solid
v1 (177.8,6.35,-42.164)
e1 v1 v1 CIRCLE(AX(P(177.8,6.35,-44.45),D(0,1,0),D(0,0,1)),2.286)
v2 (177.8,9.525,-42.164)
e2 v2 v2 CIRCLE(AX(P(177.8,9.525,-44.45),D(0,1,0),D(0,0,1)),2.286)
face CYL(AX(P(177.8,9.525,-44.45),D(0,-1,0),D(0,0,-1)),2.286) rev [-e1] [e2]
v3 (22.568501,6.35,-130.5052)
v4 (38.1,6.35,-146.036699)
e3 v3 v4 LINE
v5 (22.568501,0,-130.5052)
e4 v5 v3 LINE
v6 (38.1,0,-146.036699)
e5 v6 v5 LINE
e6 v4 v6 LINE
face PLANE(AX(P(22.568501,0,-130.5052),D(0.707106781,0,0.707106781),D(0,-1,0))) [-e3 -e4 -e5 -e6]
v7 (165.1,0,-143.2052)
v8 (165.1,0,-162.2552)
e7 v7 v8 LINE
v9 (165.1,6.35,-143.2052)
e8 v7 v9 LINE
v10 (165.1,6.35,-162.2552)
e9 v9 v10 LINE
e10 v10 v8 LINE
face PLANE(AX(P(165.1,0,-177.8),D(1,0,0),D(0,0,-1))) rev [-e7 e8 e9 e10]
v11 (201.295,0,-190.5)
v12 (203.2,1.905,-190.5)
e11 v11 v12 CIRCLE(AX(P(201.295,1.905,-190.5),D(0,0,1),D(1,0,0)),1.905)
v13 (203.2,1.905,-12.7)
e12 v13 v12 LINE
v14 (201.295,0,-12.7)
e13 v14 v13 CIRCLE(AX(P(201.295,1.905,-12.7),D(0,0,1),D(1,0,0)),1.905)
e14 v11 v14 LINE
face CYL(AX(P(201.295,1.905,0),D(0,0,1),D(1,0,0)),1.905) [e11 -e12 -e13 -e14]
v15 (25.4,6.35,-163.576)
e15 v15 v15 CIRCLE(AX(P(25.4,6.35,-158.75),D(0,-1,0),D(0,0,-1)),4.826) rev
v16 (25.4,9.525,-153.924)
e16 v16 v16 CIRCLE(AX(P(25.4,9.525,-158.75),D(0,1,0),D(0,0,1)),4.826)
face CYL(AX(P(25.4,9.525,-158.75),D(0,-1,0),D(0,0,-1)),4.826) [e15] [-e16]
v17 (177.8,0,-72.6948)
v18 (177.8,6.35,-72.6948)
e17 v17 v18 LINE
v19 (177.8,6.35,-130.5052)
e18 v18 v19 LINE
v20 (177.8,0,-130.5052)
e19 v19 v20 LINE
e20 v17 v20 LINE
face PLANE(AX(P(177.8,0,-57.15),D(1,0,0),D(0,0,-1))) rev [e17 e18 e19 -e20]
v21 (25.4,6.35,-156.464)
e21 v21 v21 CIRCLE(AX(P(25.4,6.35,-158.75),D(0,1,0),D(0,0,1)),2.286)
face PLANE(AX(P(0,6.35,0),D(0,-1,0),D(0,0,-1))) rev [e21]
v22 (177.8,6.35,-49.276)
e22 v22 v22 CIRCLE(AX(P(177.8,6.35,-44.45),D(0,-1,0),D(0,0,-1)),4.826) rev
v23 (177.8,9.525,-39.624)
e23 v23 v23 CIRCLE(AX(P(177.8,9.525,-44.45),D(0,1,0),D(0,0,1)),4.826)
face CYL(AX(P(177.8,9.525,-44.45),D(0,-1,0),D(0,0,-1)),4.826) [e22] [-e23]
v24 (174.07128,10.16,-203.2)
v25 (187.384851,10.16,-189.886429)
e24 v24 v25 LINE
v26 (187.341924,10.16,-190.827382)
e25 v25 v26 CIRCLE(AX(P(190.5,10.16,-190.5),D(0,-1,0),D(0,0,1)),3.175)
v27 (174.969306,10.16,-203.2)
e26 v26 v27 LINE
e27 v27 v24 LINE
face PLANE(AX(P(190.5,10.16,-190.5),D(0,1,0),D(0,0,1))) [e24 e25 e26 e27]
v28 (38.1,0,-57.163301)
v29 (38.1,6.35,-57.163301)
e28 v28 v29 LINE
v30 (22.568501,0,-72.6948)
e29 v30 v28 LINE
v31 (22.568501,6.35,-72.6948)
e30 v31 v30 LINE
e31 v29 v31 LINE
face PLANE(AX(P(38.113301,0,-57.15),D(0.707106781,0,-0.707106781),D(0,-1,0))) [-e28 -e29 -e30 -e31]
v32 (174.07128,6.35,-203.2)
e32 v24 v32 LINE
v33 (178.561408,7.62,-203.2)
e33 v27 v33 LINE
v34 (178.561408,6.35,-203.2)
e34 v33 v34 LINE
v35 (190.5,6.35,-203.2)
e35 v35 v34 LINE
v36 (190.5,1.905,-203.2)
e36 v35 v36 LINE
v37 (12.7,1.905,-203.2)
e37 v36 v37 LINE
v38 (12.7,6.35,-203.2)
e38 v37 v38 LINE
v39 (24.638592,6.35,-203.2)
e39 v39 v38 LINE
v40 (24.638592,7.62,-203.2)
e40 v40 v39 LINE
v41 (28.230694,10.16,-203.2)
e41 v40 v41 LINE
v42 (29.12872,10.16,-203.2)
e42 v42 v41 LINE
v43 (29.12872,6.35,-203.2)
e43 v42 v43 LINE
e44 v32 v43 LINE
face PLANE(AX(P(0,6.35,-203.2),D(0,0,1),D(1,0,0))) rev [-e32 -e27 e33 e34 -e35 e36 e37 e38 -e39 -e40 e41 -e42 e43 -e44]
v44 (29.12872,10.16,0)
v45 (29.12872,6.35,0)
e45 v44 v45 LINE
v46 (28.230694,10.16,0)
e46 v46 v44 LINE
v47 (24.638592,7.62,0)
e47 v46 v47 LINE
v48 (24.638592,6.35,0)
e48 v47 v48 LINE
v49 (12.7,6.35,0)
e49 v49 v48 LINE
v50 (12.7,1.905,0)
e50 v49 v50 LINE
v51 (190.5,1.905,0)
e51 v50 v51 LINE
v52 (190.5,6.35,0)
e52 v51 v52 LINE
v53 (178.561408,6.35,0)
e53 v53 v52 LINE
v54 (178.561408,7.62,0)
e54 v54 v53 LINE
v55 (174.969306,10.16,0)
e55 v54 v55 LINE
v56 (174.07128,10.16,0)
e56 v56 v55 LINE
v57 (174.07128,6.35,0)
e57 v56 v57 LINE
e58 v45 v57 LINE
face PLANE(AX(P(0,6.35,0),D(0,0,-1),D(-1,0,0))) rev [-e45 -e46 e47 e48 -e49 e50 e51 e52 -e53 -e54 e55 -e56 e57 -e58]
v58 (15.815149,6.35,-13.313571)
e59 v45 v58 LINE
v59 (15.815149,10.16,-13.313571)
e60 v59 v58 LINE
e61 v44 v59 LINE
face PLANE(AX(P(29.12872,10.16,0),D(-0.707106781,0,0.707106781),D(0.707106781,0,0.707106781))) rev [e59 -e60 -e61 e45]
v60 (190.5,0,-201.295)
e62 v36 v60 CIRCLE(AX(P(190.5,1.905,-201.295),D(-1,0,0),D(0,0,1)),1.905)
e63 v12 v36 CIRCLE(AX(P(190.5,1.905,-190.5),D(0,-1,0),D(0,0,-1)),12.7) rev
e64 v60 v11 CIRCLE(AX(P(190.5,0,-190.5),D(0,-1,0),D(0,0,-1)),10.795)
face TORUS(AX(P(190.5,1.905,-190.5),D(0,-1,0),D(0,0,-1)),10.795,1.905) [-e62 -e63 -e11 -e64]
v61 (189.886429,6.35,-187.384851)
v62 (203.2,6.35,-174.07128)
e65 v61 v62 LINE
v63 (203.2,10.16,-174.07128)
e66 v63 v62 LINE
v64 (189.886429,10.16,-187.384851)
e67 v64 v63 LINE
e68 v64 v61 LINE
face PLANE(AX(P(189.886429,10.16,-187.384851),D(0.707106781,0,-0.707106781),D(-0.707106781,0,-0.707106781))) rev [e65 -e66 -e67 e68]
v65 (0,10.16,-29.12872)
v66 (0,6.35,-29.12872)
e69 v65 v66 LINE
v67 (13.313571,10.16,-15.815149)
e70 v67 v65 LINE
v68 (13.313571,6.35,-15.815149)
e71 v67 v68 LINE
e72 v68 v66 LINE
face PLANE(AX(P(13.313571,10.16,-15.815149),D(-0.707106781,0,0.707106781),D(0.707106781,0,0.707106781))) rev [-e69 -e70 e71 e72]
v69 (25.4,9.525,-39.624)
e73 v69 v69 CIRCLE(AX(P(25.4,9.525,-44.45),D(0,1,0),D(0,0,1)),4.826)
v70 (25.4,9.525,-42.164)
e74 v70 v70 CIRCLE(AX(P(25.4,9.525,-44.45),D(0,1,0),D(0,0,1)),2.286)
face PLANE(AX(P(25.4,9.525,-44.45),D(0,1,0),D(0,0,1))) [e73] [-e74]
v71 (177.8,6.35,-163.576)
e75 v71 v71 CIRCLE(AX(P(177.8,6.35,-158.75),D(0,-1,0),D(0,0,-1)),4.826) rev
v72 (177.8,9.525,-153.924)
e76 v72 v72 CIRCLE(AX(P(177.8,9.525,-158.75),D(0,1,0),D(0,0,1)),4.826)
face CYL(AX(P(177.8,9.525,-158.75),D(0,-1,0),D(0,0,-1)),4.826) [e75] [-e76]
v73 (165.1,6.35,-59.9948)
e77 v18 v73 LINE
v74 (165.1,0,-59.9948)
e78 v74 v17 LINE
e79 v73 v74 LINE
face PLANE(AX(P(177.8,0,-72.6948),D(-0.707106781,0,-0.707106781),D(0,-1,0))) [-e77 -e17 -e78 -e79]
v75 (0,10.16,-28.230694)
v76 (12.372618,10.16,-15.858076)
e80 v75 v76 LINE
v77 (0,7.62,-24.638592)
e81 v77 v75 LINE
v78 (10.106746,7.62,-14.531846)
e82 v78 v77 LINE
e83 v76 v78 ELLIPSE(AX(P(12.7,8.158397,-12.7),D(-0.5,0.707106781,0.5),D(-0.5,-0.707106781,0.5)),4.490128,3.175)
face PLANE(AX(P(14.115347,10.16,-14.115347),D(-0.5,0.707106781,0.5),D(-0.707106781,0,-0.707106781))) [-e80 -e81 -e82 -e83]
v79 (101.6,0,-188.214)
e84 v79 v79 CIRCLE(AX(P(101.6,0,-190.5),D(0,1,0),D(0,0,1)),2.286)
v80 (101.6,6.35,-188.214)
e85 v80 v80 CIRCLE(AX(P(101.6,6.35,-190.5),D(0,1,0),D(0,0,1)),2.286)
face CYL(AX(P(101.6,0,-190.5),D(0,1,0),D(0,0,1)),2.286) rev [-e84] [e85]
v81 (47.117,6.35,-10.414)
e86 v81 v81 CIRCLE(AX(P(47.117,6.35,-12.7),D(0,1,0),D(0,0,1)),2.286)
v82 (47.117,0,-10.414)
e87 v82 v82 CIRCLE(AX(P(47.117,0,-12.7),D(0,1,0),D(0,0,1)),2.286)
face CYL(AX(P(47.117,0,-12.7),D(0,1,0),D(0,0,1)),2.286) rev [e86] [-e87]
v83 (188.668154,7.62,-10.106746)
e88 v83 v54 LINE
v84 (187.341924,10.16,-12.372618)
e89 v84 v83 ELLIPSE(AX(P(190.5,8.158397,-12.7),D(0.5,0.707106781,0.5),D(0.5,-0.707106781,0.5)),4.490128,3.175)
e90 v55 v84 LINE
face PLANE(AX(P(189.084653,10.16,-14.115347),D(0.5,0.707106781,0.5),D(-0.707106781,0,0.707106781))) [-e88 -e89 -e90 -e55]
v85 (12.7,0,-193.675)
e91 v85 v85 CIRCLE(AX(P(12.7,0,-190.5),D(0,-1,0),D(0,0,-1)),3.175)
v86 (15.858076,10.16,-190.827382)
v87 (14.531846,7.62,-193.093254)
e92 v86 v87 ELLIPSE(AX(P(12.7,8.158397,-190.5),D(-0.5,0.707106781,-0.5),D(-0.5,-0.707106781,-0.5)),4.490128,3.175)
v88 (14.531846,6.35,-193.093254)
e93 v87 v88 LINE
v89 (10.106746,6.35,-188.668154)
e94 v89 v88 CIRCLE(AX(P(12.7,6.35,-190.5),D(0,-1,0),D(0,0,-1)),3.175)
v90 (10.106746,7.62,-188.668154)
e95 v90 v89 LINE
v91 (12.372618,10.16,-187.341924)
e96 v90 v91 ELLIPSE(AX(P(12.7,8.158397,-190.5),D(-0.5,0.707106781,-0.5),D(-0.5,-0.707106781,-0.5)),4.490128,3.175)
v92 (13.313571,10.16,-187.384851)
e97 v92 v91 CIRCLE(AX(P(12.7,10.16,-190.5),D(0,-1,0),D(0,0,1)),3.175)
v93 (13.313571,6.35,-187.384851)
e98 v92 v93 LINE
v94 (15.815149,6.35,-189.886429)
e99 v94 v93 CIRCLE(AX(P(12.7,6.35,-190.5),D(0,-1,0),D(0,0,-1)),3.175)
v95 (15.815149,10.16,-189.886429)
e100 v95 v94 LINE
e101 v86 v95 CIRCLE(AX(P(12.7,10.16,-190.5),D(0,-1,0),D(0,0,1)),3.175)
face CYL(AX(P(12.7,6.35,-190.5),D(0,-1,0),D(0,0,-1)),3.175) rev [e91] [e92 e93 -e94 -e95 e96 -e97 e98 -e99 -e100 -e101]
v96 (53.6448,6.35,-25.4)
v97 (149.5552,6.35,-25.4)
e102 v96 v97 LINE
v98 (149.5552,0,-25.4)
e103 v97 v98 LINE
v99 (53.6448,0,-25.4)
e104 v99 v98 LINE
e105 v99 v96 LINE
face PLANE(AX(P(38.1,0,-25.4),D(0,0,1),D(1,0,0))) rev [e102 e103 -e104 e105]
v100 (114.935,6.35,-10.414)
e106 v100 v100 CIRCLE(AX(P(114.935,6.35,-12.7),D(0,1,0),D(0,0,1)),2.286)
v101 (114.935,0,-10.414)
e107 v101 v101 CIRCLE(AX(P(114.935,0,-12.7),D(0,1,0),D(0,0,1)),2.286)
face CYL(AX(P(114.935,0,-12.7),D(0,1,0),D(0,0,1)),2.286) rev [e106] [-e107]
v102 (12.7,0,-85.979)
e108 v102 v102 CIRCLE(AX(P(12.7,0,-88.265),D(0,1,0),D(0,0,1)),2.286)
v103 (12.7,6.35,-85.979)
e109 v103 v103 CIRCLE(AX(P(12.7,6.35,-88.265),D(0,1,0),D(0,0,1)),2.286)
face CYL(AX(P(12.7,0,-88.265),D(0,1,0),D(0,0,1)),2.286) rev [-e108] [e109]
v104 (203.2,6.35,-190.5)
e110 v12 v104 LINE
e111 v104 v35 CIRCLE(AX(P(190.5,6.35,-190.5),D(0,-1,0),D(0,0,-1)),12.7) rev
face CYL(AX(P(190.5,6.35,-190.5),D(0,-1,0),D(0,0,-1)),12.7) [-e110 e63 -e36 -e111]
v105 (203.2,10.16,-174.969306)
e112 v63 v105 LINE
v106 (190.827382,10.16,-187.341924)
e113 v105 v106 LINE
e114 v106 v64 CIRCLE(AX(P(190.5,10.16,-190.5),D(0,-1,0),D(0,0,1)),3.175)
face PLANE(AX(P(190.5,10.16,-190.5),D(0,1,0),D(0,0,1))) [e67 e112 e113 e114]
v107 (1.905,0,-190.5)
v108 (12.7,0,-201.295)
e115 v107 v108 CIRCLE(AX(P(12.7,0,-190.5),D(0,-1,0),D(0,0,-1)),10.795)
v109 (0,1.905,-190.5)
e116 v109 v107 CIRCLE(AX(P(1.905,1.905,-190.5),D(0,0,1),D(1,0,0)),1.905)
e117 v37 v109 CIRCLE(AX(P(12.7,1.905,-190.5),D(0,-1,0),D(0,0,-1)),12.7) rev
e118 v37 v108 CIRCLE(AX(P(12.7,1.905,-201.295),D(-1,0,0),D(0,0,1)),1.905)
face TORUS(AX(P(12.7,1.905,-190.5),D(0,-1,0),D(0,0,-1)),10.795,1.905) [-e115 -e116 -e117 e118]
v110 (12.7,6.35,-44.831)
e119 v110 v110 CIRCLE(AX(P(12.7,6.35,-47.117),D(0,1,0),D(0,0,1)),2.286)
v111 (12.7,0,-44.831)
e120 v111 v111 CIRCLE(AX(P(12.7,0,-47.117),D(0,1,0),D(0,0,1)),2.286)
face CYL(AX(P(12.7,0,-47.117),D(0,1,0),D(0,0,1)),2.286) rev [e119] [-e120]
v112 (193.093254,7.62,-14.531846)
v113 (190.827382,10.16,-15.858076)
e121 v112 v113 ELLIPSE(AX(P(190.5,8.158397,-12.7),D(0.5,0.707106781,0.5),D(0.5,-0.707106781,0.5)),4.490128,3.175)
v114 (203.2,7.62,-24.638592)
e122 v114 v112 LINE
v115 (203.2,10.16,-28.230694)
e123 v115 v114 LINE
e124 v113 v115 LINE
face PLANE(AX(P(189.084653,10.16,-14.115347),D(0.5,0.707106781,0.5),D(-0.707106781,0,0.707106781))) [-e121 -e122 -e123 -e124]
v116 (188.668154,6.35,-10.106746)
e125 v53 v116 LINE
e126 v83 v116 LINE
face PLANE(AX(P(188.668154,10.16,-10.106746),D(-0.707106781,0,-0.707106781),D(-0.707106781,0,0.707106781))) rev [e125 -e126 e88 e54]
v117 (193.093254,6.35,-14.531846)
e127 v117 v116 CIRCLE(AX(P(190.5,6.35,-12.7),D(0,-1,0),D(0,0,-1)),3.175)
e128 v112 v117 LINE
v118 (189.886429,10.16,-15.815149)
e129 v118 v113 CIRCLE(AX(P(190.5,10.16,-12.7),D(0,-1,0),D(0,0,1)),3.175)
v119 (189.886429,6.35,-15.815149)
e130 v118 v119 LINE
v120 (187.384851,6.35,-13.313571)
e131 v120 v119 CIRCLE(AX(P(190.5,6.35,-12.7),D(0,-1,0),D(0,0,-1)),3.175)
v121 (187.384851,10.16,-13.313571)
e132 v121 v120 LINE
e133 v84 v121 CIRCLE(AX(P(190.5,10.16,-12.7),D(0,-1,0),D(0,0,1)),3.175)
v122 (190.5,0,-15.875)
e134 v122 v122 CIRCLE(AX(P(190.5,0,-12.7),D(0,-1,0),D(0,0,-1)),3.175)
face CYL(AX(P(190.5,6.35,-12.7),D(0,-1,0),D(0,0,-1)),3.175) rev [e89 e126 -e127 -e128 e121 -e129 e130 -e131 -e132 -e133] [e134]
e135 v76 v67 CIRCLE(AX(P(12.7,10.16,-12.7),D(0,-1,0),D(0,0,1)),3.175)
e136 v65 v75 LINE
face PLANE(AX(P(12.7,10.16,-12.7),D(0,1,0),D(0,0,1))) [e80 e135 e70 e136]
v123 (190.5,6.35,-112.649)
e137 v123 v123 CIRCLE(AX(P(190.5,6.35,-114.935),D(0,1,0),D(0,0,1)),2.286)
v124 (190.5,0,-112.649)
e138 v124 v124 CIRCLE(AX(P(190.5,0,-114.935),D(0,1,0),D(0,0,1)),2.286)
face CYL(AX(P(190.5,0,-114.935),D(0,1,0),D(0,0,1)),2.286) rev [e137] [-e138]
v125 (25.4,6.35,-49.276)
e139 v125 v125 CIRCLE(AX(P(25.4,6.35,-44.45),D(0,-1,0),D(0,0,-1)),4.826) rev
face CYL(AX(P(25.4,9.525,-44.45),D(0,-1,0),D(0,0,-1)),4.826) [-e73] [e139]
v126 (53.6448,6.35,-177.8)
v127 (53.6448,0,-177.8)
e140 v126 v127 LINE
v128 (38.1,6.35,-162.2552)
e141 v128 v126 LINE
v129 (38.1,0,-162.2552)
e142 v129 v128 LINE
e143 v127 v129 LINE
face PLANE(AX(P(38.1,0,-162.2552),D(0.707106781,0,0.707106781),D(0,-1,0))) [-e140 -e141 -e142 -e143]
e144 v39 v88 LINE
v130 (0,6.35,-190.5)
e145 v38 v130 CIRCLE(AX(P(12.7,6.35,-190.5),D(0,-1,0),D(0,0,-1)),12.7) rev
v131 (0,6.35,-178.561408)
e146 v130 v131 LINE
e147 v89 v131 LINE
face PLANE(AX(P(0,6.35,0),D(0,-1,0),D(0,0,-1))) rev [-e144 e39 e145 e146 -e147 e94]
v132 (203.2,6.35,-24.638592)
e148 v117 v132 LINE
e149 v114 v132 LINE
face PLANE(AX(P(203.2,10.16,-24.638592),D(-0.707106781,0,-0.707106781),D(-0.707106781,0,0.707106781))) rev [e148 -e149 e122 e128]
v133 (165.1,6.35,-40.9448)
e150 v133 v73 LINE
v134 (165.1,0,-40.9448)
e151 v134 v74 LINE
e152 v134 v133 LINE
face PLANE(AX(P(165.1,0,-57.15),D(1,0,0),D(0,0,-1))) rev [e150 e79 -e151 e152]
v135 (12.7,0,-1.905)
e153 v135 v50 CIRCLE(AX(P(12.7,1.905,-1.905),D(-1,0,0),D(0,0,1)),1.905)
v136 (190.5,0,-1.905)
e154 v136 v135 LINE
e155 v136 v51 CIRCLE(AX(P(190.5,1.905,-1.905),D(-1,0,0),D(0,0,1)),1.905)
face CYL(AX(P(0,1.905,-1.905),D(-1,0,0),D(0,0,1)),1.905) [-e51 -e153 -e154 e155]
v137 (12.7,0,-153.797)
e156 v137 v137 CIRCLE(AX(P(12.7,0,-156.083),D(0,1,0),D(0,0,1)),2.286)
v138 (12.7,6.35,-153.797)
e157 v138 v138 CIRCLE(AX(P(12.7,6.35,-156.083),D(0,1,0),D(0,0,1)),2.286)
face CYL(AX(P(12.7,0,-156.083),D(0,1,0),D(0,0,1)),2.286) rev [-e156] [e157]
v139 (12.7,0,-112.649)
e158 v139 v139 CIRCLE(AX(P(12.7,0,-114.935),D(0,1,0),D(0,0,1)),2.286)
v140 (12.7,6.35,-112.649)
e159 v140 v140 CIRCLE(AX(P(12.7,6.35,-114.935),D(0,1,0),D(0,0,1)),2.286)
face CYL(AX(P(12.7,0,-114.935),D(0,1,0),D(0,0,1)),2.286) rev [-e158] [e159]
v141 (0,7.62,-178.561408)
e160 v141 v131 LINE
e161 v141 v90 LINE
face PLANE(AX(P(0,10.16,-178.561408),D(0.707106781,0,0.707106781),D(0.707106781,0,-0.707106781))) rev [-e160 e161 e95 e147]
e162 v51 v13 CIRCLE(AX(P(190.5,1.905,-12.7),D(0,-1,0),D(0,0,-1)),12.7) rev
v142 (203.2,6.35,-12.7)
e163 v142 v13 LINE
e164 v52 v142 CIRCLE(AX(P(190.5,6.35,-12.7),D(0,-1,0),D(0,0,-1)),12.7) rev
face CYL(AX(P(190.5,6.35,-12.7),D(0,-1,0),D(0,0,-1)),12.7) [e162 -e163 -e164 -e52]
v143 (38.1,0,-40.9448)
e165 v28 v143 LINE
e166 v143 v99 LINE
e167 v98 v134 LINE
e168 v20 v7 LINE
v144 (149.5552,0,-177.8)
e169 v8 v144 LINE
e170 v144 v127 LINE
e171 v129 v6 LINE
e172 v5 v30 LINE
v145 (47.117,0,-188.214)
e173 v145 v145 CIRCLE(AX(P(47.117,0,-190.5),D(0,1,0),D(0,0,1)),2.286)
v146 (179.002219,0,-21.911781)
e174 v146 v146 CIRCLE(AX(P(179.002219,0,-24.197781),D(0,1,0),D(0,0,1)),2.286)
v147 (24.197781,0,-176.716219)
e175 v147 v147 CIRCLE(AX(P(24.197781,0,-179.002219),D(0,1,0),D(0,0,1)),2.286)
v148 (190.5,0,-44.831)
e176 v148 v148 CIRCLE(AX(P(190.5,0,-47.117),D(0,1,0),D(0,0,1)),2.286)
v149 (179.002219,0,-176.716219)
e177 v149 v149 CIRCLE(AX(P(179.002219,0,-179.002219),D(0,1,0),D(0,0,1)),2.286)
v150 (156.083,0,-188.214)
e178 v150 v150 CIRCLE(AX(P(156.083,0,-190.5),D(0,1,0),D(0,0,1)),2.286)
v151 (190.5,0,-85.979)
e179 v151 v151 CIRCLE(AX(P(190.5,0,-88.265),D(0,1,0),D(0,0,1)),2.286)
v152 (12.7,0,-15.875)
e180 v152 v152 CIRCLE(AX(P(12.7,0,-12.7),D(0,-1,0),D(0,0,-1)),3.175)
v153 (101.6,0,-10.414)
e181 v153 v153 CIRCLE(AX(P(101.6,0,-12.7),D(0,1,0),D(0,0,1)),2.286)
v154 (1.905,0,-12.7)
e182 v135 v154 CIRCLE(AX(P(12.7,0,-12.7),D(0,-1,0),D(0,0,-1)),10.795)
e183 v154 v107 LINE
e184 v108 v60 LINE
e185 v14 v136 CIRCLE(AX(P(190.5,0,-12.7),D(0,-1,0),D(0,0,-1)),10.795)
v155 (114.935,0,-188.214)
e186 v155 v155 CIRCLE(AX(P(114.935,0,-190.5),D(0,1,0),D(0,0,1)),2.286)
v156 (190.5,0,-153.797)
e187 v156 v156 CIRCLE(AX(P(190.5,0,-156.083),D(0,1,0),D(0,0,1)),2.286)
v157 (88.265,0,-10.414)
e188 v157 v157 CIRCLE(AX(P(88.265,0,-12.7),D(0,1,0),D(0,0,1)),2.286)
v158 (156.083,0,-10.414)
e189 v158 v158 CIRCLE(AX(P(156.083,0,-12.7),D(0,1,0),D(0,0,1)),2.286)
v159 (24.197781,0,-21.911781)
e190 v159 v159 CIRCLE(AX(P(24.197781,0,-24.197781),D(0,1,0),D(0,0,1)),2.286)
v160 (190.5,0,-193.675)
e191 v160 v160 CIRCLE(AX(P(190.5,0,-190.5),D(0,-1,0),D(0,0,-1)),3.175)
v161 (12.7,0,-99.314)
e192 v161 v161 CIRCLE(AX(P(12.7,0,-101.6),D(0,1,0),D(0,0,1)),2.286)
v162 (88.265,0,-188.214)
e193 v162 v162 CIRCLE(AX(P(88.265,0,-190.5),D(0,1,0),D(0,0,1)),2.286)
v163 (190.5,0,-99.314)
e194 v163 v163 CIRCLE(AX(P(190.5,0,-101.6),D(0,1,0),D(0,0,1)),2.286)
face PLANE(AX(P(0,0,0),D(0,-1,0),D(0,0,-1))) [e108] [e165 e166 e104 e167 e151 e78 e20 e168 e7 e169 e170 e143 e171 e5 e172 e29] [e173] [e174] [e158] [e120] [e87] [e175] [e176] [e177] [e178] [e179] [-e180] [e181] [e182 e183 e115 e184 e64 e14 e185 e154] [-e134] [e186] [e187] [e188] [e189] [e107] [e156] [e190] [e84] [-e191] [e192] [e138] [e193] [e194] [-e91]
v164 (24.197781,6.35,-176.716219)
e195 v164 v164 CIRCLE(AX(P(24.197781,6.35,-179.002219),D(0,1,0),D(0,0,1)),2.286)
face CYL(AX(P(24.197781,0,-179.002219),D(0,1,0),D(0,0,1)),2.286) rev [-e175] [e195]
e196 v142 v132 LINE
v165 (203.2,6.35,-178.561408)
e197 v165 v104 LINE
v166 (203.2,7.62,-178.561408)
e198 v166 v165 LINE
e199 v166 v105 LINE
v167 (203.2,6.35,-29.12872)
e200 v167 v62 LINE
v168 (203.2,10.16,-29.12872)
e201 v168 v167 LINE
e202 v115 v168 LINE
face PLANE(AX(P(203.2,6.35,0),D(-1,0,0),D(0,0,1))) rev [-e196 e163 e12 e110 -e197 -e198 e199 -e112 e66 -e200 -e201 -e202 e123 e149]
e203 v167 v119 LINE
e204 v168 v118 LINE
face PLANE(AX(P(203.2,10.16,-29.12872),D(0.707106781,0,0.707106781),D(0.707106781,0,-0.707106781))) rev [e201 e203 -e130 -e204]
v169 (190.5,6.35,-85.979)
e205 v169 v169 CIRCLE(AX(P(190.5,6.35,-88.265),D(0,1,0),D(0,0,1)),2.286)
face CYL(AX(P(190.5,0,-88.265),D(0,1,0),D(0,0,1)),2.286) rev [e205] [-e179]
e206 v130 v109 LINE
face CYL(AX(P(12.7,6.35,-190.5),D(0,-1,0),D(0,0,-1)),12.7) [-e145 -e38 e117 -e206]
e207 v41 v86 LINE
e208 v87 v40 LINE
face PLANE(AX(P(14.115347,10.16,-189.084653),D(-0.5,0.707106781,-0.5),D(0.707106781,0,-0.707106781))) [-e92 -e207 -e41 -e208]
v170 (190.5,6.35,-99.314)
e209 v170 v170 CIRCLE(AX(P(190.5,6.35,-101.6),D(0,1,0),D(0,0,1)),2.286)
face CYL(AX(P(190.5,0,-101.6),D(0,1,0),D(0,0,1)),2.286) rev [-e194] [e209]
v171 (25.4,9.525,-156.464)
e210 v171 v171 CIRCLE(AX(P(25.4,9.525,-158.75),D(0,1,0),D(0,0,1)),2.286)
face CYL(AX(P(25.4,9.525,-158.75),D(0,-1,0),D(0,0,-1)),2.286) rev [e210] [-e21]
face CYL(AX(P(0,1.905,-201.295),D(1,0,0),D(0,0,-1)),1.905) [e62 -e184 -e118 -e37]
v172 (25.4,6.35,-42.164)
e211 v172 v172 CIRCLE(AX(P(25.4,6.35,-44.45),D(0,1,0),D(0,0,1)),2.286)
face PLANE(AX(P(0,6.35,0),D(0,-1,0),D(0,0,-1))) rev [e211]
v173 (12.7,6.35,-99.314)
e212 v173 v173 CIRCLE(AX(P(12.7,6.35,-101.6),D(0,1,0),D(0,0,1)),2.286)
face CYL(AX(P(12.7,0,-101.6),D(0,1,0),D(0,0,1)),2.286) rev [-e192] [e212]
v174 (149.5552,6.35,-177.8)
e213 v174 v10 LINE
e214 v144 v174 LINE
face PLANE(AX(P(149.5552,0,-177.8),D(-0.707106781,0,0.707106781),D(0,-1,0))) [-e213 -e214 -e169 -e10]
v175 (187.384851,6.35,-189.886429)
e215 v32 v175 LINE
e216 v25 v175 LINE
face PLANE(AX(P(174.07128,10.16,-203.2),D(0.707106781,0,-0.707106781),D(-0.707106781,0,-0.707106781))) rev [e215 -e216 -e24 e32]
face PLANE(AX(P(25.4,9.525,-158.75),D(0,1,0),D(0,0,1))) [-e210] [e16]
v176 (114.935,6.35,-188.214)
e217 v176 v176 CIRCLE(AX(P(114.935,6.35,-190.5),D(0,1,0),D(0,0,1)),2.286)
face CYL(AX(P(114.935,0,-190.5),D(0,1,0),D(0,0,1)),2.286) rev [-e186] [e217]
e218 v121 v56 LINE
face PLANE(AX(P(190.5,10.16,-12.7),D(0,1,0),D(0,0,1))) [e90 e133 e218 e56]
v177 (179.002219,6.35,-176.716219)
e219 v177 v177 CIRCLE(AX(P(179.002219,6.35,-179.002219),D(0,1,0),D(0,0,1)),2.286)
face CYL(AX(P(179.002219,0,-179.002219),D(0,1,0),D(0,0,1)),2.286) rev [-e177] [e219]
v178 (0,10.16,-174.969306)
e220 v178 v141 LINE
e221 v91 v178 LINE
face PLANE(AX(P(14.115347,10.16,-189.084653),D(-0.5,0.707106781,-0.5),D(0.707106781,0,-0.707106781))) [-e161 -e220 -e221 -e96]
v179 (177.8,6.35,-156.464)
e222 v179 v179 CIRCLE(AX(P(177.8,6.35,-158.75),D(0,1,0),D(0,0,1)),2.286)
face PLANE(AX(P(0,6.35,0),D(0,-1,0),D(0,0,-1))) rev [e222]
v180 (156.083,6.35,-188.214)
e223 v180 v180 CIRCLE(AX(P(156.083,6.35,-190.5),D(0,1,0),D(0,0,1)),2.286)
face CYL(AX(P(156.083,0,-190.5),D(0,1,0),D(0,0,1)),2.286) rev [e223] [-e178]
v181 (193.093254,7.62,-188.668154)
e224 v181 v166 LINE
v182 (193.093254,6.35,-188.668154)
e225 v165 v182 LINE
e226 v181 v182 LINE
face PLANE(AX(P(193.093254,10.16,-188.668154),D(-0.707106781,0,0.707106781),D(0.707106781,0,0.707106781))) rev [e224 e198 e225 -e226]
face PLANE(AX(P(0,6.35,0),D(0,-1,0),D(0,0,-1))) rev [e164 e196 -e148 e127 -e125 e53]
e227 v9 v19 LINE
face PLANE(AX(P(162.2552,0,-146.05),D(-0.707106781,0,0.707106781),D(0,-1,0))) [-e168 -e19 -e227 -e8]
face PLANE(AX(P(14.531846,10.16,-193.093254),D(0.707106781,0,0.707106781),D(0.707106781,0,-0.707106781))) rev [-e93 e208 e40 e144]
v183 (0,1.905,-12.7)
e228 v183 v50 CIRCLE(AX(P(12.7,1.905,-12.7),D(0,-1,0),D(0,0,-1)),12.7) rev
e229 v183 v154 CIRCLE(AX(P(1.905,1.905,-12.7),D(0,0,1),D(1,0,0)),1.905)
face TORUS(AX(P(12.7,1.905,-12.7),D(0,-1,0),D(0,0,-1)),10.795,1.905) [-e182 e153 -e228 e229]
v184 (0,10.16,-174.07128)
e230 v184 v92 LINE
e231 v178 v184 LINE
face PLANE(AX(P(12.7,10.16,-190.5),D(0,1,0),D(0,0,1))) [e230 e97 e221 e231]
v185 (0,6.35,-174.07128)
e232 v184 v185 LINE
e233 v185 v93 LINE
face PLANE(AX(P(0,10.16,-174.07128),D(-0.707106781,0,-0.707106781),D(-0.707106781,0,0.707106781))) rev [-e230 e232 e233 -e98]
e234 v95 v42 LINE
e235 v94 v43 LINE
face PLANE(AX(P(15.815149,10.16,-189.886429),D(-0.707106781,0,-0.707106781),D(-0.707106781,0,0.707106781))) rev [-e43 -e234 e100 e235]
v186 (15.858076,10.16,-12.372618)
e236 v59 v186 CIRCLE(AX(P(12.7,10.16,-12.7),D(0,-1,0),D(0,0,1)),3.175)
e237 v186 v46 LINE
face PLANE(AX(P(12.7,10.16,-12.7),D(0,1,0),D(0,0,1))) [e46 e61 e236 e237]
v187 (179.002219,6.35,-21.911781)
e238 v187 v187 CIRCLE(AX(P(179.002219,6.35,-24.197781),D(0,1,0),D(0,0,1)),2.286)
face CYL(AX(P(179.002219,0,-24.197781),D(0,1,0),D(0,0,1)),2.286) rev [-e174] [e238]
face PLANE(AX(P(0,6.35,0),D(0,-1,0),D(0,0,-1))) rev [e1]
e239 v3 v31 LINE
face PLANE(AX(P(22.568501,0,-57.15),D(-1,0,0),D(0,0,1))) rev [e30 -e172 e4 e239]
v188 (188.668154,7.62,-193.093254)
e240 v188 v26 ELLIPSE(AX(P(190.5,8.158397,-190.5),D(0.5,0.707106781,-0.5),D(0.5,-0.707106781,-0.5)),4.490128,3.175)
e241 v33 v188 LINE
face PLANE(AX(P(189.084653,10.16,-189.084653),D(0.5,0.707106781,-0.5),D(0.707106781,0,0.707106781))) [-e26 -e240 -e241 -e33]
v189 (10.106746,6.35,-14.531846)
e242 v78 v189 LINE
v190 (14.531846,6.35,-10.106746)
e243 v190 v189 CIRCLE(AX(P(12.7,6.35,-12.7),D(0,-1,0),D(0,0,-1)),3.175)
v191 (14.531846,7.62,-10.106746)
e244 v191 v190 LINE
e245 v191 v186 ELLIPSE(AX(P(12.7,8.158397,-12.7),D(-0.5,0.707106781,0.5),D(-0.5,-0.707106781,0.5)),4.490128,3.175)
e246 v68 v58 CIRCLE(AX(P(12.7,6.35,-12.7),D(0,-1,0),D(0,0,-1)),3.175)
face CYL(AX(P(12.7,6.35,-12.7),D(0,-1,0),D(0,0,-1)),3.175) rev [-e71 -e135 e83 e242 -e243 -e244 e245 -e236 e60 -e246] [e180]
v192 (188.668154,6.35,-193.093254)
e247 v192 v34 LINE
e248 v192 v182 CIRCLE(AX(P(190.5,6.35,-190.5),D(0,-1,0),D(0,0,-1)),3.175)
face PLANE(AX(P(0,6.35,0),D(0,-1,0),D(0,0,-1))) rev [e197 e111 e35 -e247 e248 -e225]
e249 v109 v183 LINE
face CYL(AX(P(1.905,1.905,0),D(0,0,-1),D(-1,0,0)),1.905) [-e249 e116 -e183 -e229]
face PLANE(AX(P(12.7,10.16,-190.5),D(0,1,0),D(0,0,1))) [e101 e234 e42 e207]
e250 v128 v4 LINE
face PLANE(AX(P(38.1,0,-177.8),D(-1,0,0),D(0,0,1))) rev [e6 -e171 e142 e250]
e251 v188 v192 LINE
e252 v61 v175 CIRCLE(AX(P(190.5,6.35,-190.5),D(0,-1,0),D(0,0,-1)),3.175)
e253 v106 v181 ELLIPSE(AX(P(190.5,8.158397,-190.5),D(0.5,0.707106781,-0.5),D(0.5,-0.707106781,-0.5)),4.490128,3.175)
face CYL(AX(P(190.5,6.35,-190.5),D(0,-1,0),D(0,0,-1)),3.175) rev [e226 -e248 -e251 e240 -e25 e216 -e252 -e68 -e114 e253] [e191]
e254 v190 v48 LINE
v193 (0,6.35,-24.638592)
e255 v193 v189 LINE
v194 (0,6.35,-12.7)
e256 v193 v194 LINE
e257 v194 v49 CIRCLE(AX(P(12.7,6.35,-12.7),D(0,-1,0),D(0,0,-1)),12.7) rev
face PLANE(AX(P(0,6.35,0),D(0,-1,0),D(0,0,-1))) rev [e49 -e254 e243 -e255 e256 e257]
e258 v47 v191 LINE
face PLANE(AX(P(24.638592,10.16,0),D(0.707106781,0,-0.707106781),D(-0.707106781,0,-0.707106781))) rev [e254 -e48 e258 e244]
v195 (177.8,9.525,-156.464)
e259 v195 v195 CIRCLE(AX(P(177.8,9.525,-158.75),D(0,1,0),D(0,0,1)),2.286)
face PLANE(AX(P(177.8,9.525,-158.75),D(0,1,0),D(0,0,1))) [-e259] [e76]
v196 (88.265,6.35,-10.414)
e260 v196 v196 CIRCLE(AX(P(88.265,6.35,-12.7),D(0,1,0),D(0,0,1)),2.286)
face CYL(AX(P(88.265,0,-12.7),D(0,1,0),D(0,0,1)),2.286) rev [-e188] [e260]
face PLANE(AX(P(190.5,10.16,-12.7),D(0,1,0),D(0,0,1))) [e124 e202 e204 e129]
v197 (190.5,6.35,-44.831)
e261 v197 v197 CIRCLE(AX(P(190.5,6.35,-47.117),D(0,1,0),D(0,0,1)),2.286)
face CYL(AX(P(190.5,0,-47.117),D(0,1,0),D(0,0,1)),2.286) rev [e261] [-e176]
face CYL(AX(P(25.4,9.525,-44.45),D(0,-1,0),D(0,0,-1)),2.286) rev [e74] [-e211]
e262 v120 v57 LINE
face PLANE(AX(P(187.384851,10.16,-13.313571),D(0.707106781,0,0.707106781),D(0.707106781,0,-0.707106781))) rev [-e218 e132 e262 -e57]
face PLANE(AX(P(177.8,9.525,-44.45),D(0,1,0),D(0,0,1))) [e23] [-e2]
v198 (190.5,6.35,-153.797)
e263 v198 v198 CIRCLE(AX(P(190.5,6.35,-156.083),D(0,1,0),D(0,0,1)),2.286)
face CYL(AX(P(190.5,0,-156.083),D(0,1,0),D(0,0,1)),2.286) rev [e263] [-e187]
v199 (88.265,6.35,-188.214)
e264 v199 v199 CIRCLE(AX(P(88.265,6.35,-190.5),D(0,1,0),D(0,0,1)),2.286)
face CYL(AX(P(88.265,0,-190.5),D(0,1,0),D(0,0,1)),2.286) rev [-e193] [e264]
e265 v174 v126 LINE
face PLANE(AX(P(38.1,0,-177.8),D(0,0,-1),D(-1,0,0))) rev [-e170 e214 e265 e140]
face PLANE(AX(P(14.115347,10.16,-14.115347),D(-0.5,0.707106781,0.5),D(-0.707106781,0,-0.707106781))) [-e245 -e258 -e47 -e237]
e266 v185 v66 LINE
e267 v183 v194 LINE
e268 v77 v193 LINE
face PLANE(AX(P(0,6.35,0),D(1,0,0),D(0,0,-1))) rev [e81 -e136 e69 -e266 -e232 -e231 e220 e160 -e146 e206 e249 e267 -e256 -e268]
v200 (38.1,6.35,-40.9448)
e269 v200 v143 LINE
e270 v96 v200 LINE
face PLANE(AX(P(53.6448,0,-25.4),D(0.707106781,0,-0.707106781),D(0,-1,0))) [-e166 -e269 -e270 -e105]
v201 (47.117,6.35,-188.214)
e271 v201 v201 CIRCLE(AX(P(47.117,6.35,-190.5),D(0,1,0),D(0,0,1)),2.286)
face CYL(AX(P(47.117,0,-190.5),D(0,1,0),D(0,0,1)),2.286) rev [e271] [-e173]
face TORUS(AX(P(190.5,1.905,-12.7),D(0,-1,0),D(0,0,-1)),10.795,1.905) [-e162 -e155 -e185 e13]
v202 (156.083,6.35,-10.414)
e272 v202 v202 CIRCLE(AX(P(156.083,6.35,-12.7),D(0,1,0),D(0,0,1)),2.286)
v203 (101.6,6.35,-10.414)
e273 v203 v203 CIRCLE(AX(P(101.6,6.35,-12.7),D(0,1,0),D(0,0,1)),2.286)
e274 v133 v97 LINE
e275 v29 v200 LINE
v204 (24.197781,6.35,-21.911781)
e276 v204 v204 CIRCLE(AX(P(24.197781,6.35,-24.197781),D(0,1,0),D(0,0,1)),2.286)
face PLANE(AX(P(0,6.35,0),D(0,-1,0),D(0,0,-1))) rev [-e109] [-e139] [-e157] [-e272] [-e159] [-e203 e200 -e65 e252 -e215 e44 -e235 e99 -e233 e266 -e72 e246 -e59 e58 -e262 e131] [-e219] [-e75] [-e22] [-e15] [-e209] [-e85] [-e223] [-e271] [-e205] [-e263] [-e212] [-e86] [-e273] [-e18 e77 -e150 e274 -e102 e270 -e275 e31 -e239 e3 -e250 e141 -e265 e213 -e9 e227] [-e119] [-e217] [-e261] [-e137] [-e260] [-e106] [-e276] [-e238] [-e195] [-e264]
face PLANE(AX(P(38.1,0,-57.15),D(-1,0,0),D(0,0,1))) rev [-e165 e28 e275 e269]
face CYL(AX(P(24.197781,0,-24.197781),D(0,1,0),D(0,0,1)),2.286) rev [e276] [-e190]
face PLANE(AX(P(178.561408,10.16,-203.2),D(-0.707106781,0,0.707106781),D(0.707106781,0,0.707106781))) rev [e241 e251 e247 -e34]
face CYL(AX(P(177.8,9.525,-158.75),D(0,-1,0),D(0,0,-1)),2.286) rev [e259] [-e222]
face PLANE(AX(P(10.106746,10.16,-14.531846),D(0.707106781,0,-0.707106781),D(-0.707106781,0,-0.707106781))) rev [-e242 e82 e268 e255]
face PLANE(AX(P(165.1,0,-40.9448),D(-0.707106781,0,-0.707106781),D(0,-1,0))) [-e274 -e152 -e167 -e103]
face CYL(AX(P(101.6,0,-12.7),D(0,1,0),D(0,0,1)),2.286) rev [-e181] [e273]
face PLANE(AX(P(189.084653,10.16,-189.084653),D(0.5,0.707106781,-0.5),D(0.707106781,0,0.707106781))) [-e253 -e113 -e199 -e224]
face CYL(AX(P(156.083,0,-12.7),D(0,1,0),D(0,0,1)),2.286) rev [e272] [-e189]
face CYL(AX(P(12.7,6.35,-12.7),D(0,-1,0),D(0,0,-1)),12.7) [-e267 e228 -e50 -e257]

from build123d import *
from build123d.topology import SkipClean

# Parameters (mm, degrees)
SKETCH1_W           = 203.2
SKETCH1_H           = 203.2
BOSS_EXTRUDE1_DEPTH = 6.35
FILLET1_R           = 12.7
SKETCH2_R           = 3.175
CUT_EXTRUDE1_DEPTH  = 288.438345563
FILLET2_R           = 1.905
SKETCH3_R           = 2.286
CUT_EXTRUDE2_DEPTH  = 288.438345634
SKETCH4_R           = 2.286
CUT_EXTRUDE3_DEPTH  = 288.438345634
SKETCH5_R           = 4.826
SKETCH5_R_2         = 2.286
BOSS_EXTRUDE2_DEPTH = 3.175
BOSS_EXTRUDE3_DEPTH = 3.81
CHAMFER1_SIZE       = 2.54
CUT_EXTRUDE4_DEPTH  = 288.438345634
CHAMFER2_SIZE       = 15.5448
SKETCH8_R           = 2.286
CUT_EXTRUDE5_DEPTH  = 288.438345634


with BuildPart() as part:
    # Sketch1 → Boss-Extrude1 (new body)
    with BuildSketch(Plane(origin=(0, 0, 0), x_dir=(1, 0, 0), z_dir=(0, 1, 0))):
        with Locations((101.6, 101.6)):
            Rectangle(SKETCH1_W, SKETCH1_H)
    extrude(amount=BOSS_EXTRUDE1_DEPTH)

    # Fillet1
    fillet1_edges = [part.edges().sort_by_distance(p)[0] for p in [
        (0, 3.175, -203.2),
        (203.2, 3.175, -203.2),
        (203.2, 3.175, 0),
        (0, 3.175, 0),
    ]]
    fillet(fillet1_edges, radius=FILLET1_R)

    # Sketch2 → Cut-Extrude1 (cut, through all)
    with BuildSketch(Plane.XZ):
        with Locations(Location((12.7, -12.7, 0), (0, 0, 270))):
            Circle(SKETCH2_R)
        with Locations(Location((190.5, -12.7, 0), (0, 0, 270))):
            Circle(SKETCH2_R)
        with Locations(Location((190.5, -190.5, 0), (0, 0, 270))):
            Circle(SKETCH2_R)
        with Locations(Location((12.7, -190.5, 0), (0, 0, 270))):
            Circle(SKETCH2_R)
    extrude(amount=-CUT_EXTRUDE1_DEPTH, mode=Mode.SUBTRACT)

    # Fillet2
    fillet2_edges = [part.edges().sort_by_distance(p)[0] for p in [
        (0, 0, -101.6),
        (101.6, 0, -203.2),
        (203.2, 0, -101.6),
        (101.6, 0, 0),
        (199.480256121, 0, -199.480256121),
        (199.480256121, 0, -3.719743879),
        (3.719743879, 0, -3.719743879),
        (3.719743879, 0, -199.480256121),
    ]]
    fillet(fillet2_edges, radius=FILLET2_R)

    # Sketch3 → Cut-Extrude2 (cut, through all)
    with BuildSketch(Plane(origin=(0, 6.35, 0), x_dir=(1, 0, 0), z_dir=(0, 1, 0))):
        with Locations(Location((24.197781122, 24.197781122, 0), (0, 0, 270))):
            Circle(SKETCH3_R)
        with Locations(Location((179.002218878, 179.002218878, 0), (0, 0, 270))):
            Circle(SKETCH3_R)
        with Locations(Location((179.002218878, 24.197781122, 0), (0, 0, 270))):
            Circle(SKETCH3_R)
        with Locations(Location((24.197781122, 179.002218878, 0), (0, 0, 270))):
            Circle(SKETCH3_R)
    extrude(amount=-CUT_EXTRUDE2_DEPTH, mode=Mode.SUBTRACT)

    # Sketch4 → Cut-Extrude3 (cut, through all)
    with BuildSketch(Plane(origin=(0, 6.35, 0), x_dir=(1, 0, 0), z_dir=(0, 1, 0))):
        with Locations(Location((47.117, 12.7, 0), (0, 0, 270))):
            Circle(SKETCH4_R)
        with Locations(Location((156.083, 12.7, 0), (0, 0, 270))):
            Circle(SKETCH4_R)
        with Locations(Location((12.7, 156.083, 0), (0, 0, 270))):
            Circle(SKETCH4_R)
        with Locations(Location((12.7, 47.117, 0), (0, 0, 270))):
            Circle(SKETCH4_R)
        with Locations(Location((156.083, 190.5, 0), (0, 0, 270))):
            Circle(SKETCH4_R)
        with Locations(Location((47.117, 190.5, 0), (0, 0, 270))):
            Circle(SKETCH4_R)
        with Locations(Location((190.5, 47.117, 0), (0, 0, 270))):
            Circle(SKETCH4_R)
        with Locations(Location((190.5, 156.083, 0), (0, 0, 270))):
            Circle(SKETCH4_R)
        with Locations(Location((101.6, 12.7, 0), (0, 0, 270))):
            Circle(SKETCH4_R)
        with Locations(Location((12.7, 101.6, 0), (0, 0, 270))):
            Circle(SKETCH4_R)
        with Locations(Location((101.6, 190.5, 0), (0, 0, 270))):
            Circle(SKETCH4_R)
        with Locations(Location((190.5, 101.6, 0), (0, 0, 270))):
            Circle(SKETCH4_R)
    extrude(amount=-CUT_EXTRUDE3_DEPTH, mode=Mode.SUBTRACT)

    # Sketch5 → Boss-Extrude2 (add)
    # profile 1 of 4: a face of its own
    with BuildSketch(Plane(origin=(0, 6.35, 0), x_dir=(1, 0, 0), z_dir=(0, 1, 0))):
        with Locations(Location((25.4, 158.75, 0), (0, 0, 90))):
            Circle(SKETCH5_R)
        with Locations(Location((25.4, 158.75, 0), (0, 0, 270))):
            Circle(SKETCH5_R_2, mode=Mode.SUBTRACT)
    # profile 2 of 4: a face of its own
    with BuildSketch(Plane(origin=(0, 6.35, 0), x_dir=(1, 0, 0), z_dir=(0, 1, 0))):
        with Locations(Location((177.8, 158.75, 0), (0, 0, 90))):
            Circle(SKETCH5_R)
        with Locations(Location((177.8, 158.75, 0), (0, 0, 270))):
            Circle(SKETCH5_R_2, mode=Mode.SUBTRACT)
    # profile 3 of 4: a face of its own
    with BuildSketch(Plane(origin=(0, 6.35, 0), x_dir=(1, 0, 0), z_dir=(0, 1, 0))):
        with Locations(Location((177.8, 44.45, 0), (0, 0, 90))):
            Circle(SKETCH5_R)
        with Locations(Location((177.8, 44.45, 0), (0, 0, 270))):
            Circle(SKETCH5_R_2, mode=Mode.SUBTRACT)
    # profile 4 of 4: a face of its own
    with BuildSketch(Plane(origin=(0, 6.35, 0), x_dir=(1, 0, 0), z_dir=(0, 1, 0))):
        with Locations(Location((25.4, 44.45, 0), (0, 0, 90))):
            Circle(SKETCH5_R)
        with Locations(Location((25.4, 44.45, 0), (0, 0, 270))):
            Circle(SKETCH5_R_2, mode=Mode.SUBTRACT)
    extrude(amount=BOSS_EXTRUDE2_DEPTH)

    # Sketch6 → Boss-Extrude3 (add)
    with SkipClean():  # the faces are left unmerged after this step: merging them gives an invalid solid
        with BuildSketch(Plane(origin=(0, 6.35, 0), x_dir=(1, 0, 0), z_dir=(0, 1, 0))):
            with BuildLine():
                Line((203.2, 29.12872), (189.886429467, 15.815149467))
                ThreePointArc((189.886429467, 15.815149467), (191.679620112, 15.647731567), (193.093253903, 14.531845843))
                Line((193.093253903, 14.531845843), (203.2, 24.638591939))
                Line((203.2, 24.638591939), (203.2, 29.12872))
            make_face()
            with BuildLine():
                Line((178.561408061, 0), (174.07128, 0))
                Line((174.07128, 0), (187.384850533, 13.313570533))
                ThreePointArc((187.384850533, 13.313570533), (187.552268433, 11.520379888), (188.668154157, 10.106746097))
                Line((188.668154157, 10.106746097), (178.561408061, 0))
            make_face()
            with BuildLine():
                Line((13.313570533, 15.815149467), (0, 29.12872))
                Line((0, 29.12872), (0, 24.638591939))
                Line((0, 24.638591939), (10.106746097, 14.531845843))
                ThreePointArc((10.106746097, 14.531845843), (11.520379888, 15.647731567), (13.313570533, 15.815149467))
            make_face()
            with BuildLine():
                Line((24.638591939, 0), (14.531845843, 10.106746097))
                ThreePointArc((14.531845843, 10.106746097), (15.647731567, 11.520379888), (15.815149467, 13.313570533))
                Line((15.815149467, 13.313570533), (29.12872, 0))
                Line((29.12872, 0), (24.638591939, 0))
            make_face()
            with BuildLine():
                Line((15.815149467, 189.886429467), (29.12872, 203.2))
                Line((29.12872, 203.2), (24.638591939, 203.2))
                Line((24.638591939, 203.2), (14.531845843, 193.093253903))
                ThreePointArc((14.531845843, 193.093253903), (15.647731567, 191.679620112), (15.815149467, 189.886429467))
            make_face()
            with BuildLine():
                Line((0, 178.561408061), (10.106746097, 188.668154157))
                ThreePointArc((10.106746097, 188.668154157), (11.520379888, 187.552268433), (13.313570533, 187.384850533))
                Line((13.313570533, 187.384850533), (0, 174.07128))
                Line((0, 174.07128), (0, 178.561408061))
            make_face()
            with BuildLine():
                Line((189.886429467, 187.384850533), (203.2, 174.07128))
                Line((203.2, 174.07128), (203.2, 178.561408061))
                Line((203.2, 178.561408061), (193.093253903, 188.668154157))
                ThreePointArc((193.093253903, 188.668154157), (191.679620112, 187.552268433), (189.886429467, 187.384850533))
            make_face()
            with BuildLine():
                Line((178.561408061, 203.2), (188.668154157, 193.093253903))
                ThreePointArc((188.668154157, 193.093253903), (187.552268433, 191.679620112), (187.384850533, 189.886429467))
                Line((187.384850533, 189.886429467), (174.07128, 203.2))
                Line((174.07128, 203.2), (178.561408061, 203.2))
            make_face()
        extrude(amount=BOSS_EXTRUDE3_DEPTH)

    # Chamfer1
    chamfer1_edges = [part.edges().sort_by_distance(p)[0] for p in [
        (198.146626952, 10.16, -19.585218891),
        (183.614781109, 10.16, -5.053373048),
        (19.585218891, 10.16, -5.053373048),
        (5.053373048, 10.16, -19.585218891),
        (5.053373048, 10.16, -183.614781109),
        (19.585218891, 10.16, -198.146626952),
        (183.614781109, 10.16, -198.146626952),
        (198.146626952, 10.16, -183.614781109),
    ]]
    chamfer(chamfer1_edges, length=CHAMFER1_SIZE)

    # Sketch7 → Cut-Extrude4 (cut, through all)
    with BuildSketch(Plane(origin=(0, 6.35, 0), x_dir=(1, 0, 0), z_dir=(0, 1, 0))):
        Polygon((38.1, 57.15), (38.1, 25.4), (165.1, 25.4), (165.1, 57.15), (177.8, 57.15), (177.8, 146.05), (165.1, 146.05), (165.1, 177.8), (38.1, 177.8), (38.1, 146.05), (22.56850138, 146.05), (22.56850138, 57.15), align=None)
    extrude(amount=-CUT_EXTRUDE4_DEPTH, mode=Mode.SUBTRACT)

    # Chamfer2
    # the kernel refuses this chamfer: 15.5448 mm, written as the material it adds along each edge
    with BuildSketch(Plane(origin=(22.56850138, 6.35, -57.15), x_dir=(-0.027495876610586303, 0, -0.9996219169112966), z_dir=(0, -1, 0))) as chamfer2_piece_1_section:
        Polygon((CHAMFER2_SIZE * 0.999621916911, CHAMFER2_SIZE * 0.0274958766106), (-CHAMFER2_SIZE * 0.0274958766106, CHAMFER2_SIZE * 0.999621916911), (0, 0), align=None)
    chamfer2_piece_1 = extrude(amount=6.35, mode=Mode.PRIVATE)
    chamfer2_piece_1 = split(chamfer2_piece_1, bisect_by=Plane(origin=(38.1, 3.175, -62.286463207), z_dir=(-1, 0, 0)), keep=Keep.TOP, mode=Mode.PRIVATE)
    add(chamfer2_piece_1)
    with BuildSketch(Plane(origin=(38.1, 6.35, -25.4), x_dir=(-0.027495876610586754, 0, -0.9996219169112966), z_dir=(0, -1, 0)), Plane(origin=(165.1, 6.35, -25.4), x_dir=(-0.9996219169112966, 0, 0.027495876610586292), z_dir=(0, -1, 0)), Plane(origin=(165.1, 6.35, -177.8), x_dir=(0.027495876610586292, 0, 0.9996219169112966), z_dir=(0, -1, 0)), Plane(origin=(38.1, 6.35, -177.8), x_dir=(0.9996219169112966, 0, -0.027495876610586317), z_dir=(0, -1, 0))) as chamfer2_piece_2:
        Polygon((CHAMFER2_SIZE * 0.999621916911, CHAMFER2_SIZE * 0.0274958766106), (-CHAMFER2_SIZE * 0.0274958766106, CHAMFER2_SIZE * 0.999621916911), (0, 0), align=None)
    extrude(amount=6.35)
    with BuildSketch(Plane(origin=(177.8, 6.35, -57.15), x_dir=(-0.9996219169112966, 0, 0.027495876610586292), z_dir=(0, -1, 0))) as chamfer2_piece_3_section:
        Polygon((CHAMFER2_SIZE * 0.999621916911, CHAMFER2_SIZE * 0.0274958766106), (-CHAMFER2_SIZE * 0.0274958766106, CHAMFER2_SIZE * 0.999621916911), (0, 0), align=None)
    chamfer2_piece_3 = extrude(amount=6.35, mode=Mode.PRIVATE)
    chamfer2_piece_3 = split(chamfer2_piece_3, bisect_by=Plane(origin=(165.1, 3.175, -62.494102003), z_dir=(1, 0, 0)), keep=Keep.TOP, mode=Mode.PRIVATE)
    add(chamfer2_piece_3)
    with BuildSketch(Plane(origin=(177.8, 6.35, -146.05), x_dir=(0.027495876610586292, 0, 0.9996219169112966), z_dir=(0, -1, 0))) as chamfer2_piece_4_section:
        Polygon((CHAMFER2_SIZE * 0.999621916911, CHAMFER2_SIZE * 0.0274958766106), (-CHAMFER2_SIZE * 0.0274958766106, CHAMFER2_SIZE * 0.999621916911), (0, 0), align=None)
    chamfer2_piece_4 = extrude(amount=6.35, mode=Mode.PRIVATE)
    chamfer2_piece_4 = split(chamfer2_piece_4, bisect_by=Plane(origin=(165.1, 3.175, -140.705897997), z_dir=(1, 0, 0)), keep=Keep.TOP, mode=Mode.PRIVATE)
    add(chamfer2_piece_4)
    with BuildSketch(Plane(origin=(22.56850138, 6.35, -146.05), x_dir=(0.9996219169112966, 0, -0.027495876610586303), z_dir=(0, -1, 0))) as chamfer2_piece_5_section:
        Polygon((CHAMFER2_SIZE * 0.999621916911, CHAMFER2_SIZE * 0.0274958766106), (-CHAMFER2_SIZE * 0.0274958766106, CHAMFER2_SIZE * 0.999621916911), (0, 0), align=None)
    chamfer2_piece_5 = extrude(amount=6.35, mode=Mode.PRIVATE)
    chamfer2_piece_5 = split(chamfer2_piece_5, bisect_by=Plane(origin=(38.1, 3.175, -140.913536793), z_dir=(-1, 0, 0)), keep=Keep.TOP, mode=Mode.PRIVATE)
    add(chamfer2_piece_5)

    # Sketch8 → Cut-Extrude5 (cut, through all)
    with BuildSketch(Plane(origin=(0, 6.35, 0), x_dir=(1, 0, 0), z_dir=(0, 1, 0))):
        with Locations(Location((88.265, 12.7, 0), (0, 0, 270))):
            Circle(SKETCH8_R)
        with Locations(Location((114.935, 12.7, 0), (0, 0, 270))):
            Circle(SKETCH8_R)
        with Locations(Location((101.6, 12.7, 0), (0, 0, 270))):
            Circle(SKETCH8_R)
        with Locations(Location((12.7, 114.935, 0), (0, 0, 270))):
            Circle(SKETCH8_R)
        with Locations(Location((12.7, 88.265, 0), (0, 0, 270))):
            Circle(SKETCH8_R)
        with Locations(Location((114.935, 190.5, 0), (0, 0, 270))):
            Circle(SKETCH8_R)
        with Locations(Location((88.265, 190.5, 0), (0, 0, 270))):
            Circle(SKETCH8_R)
        with Locations(Location((190.5, 88.265, 0), (0, 0, 270))):
            Circle(SKETCH8_R)
        with Locations(Location((190.5, 114.935, 0), (0, 0, 270))):
            Circle(SKETCH8_R)
    extrude(amount=-CUT_EXTRUDE5_DEPTH, mode=Mode.SUBTRACT)


solid = part.part
